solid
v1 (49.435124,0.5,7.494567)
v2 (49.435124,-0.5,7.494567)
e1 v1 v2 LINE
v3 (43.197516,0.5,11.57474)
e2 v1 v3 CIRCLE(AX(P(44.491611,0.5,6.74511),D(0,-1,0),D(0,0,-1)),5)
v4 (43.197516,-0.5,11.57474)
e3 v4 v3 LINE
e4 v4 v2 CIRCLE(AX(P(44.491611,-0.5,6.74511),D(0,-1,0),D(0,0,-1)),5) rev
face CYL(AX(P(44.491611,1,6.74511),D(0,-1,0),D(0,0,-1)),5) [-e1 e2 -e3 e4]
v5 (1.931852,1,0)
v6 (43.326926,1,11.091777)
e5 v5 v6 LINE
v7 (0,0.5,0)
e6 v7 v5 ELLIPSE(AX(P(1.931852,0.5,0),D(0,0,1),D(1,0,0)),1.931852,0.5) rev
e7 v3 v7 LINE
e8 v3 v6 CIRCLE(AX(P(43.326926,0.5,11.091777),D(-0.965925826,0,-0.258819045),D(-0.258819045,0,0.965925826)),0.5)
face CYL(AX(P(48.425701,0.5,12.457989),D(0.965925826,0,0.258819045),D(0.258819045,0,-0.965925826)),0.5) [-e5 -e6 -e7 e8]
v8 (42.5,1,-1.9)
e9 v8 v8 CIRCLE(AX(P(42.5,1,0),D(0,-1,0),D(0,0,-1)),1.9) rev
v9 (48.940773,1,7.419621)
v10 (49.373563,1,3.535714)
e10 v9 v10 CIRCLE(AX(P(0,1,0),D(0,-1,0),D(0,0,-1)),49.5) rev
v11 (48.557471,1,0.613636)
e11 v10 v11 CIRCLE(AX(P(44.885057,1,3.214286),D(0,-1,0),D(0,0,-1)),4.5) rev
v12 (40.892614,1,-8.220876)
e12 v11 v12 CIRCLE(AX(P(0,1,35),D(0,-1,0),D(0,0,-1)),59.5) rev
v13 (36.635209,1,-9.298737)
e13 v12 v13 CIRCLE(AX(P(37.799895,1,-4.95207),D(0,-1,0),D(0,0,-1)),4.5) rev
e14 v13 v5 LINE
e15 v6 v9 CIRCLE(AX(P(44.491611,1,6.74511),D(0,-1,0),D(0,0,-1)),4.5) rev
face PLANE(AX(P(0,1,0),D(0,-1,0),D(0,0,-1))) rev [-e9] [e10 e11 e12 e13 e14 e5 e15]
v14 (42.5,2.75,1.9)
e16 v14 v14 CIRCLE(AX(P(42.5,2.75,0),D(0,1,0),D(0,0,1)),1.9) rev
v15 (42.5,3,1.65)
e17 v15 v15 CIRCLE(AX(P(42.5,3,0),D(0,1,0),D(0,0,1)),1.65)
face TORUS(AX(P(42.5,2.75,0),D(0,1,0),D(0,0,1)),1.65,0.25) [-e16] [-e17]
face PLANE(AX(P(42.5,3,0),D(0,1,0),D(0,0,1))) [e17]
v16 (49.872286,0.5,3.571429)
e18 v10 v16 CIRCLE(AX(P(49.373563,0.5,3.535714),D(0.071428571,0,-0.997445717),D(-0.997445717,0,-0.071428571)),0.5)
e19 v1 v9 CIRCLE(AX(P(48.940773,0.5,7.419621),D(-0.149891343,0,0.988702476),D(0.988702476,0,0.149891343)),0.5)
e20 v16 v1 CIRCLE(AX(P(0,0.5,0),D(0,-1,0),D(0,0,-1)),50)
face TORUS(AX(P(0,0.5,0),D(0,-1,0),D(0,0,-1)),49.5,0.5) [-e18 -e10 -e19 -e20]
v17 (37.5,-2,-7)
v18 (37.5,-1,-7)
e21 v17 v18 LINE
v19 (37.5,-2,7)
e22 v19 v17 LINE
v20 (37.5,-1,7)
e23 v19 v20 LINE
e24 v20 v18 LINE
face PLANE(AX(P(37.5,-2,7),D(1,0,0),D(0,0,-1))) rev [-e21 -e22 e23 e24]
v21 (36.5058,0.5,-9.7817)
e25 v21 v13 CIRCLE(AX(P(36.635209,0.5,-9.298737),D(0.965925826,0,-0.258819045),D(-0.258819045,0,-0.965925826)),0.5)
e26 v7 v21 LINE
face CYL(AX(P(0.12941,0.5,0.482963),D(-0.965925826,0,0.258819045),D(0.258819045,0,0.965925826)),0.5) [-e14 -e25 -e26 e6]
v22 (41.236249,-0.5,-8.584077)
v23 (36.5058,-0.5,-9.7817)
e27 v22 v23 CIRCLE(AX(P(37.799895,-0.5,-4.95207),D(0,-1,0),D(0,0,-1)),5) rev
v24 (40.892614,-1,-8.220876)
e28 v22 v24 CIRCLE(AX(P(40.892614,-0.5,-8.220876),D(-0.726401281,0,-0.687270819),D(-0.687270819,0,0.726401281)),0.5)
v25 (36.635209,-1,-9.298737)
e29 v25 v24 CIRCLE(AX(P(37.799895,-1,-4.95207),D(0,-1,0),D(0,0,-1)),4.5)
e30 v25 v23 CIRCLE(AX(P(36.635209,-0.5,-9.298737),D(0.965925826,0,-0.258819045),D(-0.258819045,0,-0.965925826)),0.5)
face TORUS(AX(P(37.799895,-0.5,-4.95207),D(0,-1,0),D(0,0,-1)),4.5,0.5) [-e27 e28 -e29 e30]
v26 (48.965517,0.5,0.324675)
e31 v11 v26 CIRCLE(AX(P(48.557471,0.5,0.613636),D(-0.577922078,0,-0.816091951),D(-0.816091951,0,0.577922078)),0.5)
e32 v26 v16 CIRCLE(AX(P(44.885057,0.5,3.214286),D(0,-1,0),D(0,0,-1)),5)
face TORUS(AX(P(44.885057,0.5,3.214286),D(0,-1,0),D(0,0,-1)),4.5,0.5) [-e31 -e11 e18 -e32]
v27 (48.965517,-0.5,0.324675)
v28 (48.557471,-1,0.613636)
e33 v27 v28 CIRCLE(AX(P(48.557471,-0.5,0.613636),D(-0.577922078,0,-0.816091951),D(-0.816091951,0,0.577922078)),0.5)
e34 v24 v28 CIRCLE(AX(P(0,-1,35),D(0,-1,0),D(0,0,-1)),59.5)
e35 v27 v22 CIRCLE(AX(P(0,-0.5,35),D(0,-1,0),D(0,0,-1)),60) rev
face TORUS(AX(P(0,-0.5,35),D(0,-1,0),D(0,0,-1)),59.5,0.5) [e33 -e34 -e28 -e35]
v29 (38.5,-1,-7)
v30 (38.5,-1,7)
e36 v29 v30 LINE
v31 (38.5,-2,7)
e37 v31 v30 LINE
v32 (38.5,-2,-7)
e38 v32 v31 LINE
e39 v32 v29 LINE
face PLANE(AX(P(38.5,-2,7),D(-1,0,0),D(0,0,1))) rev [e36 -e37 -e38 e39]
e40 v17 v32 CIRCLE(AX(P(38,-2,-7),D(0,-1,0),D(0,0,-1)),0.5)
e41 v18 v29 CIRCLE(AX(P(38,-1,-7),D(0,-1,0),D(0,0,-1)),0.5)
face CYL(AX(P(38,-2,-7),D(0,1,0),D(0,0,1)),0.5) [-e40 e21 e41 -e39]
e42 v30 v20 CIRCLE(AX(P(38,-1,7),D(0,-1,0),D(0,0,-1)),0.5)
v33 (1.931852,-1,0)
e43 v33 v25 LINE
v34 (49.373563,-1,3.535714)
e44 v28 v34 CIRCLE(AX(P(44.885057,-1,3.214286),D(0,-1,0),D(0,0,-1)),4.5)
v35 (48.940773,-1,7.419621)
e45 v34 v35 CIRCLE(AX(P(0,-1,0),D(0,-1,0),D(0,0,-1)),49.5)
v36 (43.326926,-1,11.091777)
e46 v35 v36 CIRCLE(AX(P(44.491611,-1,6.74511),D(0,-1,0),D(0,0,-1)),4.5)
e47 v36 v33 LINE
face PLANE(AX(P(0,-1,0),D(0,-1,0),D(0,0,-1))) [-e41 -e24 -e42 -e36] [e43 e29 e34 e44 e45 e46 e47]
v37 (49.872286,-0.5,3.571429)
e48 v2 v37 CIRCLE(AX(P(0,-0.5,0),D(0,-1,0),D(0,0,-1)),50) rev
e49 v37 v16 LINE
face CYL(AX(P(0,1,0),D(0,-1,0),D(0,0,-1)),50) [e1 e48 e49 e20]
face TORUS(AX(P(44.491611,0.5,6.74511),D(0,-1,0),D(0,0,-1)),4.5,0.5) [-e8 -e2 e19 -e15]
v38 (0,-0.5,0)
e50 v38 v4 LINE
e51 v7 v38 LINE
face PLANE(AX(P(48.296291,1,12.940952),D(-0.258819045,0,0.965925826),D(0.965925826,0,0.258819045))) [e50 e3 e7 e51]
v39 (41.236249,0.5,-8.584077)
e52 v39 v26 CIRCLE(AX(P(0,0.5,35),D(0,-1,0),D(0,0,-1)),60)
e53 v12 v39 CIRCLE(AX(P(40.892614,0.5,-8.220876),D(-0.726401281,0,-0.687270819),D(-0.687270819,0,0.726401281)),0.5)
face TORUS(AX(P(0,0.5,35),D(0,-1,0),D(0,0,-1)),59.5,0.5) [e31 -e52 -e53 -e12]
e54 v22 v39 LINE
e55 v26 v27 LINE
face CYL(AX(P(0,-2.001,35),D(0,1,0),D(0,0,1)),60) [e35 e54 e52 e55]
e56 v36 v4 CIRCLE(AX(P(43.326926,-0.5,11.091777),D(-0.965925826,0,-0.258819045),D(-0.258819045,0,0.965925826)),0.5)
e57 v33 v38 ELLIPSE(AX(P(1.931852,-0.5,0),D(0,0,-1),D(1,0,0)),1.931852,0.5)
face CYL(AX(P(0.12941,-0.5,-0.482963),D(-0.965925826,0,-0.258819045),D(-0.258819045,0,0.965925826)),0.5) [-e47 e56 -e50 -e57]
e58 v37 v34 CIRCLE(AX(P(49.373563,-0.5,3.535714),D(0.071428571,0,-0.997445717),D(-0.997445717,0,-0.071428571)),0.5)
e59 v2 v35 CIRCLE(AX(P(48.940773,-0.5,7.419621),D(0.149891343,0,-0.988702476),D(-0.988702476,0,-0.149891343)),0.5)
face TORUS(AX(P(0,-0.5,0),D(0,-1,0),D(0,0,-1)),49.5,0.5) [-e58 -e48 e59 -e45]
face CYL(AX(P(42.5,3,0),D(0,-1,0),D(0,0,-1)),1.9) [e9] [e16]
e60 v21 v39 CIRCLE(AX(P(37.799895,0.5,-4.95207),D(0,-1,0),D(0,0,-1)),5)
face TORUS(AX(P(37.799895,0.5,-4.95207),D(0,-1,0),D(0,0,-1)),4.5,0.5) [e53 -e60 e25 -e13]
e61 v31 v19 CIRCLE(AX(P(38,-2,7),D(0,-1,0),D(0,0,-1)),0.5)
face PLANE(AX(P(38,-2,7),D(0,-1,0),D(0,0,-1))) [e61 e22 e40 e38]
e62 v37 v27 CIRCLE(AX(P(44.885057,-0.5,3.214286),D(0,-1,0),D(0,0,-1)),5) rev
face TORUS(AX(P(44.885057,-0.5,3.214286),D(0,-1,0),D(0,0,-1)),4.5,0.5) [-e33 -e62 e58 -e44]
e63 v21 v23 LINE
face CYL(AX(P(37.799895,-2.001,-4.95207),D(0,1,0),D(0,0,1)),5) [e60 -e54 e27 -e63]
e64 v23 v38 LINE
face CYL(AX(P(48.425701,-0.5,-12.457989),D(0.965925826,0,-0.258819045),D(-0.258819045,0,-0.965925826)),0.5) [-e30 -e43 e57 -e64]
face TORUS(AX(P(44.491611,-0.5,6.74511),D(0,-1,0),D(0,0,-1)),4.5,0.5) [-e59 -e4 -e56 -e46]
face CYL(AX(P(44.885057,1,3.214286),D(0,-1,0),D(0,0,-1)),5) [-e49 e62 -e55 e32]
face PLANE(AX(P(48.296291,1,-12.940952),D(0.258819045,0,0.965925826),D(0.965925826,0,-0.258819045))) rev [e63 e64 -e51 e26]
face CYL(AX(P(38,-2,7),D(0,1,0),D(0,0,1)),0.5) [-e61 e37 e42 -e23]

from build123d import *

# Parameters (mm, degrees)
BOSS_EXTRUDE2_DEPTH = 1
BOSS_EXTRUDE3_DEPTH = 1
CUT_EXTRUDE3_START  = -2
CUT_EXTRUDE3_DEPTH  = 2
FILLET1_R           = 5
FILLET2_R           = 0.5
SKETCH2_R           = 1.9
BOSS_EXTRUDE4_DEPTH = 2
FILLET3_R           = 0.25


# Read off the part's stored shape, not the designer's step: Cut-Extrude3
with BuildPart() as part:
    # Sketch1 → Boss-Extrude2 (new, symmetric)
    with BuildSketch(Plane(origin=(0, 0, 0), x_dir=(1, 0, 0), z_dir=(0, 1, 0))):
        with BuildLine():
            Line((48.296291314, -12.940952255), (0, 0))
            Line((0, 0), (48.296291314, 12.940952255))
            ThreePointArc((48.296291314, 12.940952255), (50, 0), (48.296291314, -12.940952255))
        make_face()
    extrude(amount=BOSS_EXTRUDE2_DEPTH, both=True)

    # Sketch3 → Boss-Extrude3 (add)
    with BuildSketch(Plane(origin=(0, -1, 0), x_dir=(-1, 0, 0), z_dir=(0, -1, 0))):
        with BuildLine():
            Line((-38.5, -7), (-38.5, 7))
            ThreePointArc((-38.5, 7), (-38, 7.5), (-37.5, 7))
            Line((-37.5, 7), (-37.5, -7))
            ThreePointArc((-37.5, -7), (-38, -7.5), (-38.5, -7))
        make_face()
    extrude(amount=BOSS_EXTRUDE3_DEPTH)

    # Cut-Extrude3 outline → Cut-Extrude3 (cut)
    with BuildSketch(Plane(origin=(0, 1, 0), x_dir=(1, 0, 0), z_dir=(0, 1, 0)).offset(CUT_EXTRUDE3_START)):
        with BuildLine():
            ThreePointArc((39.129720832, 10.484777097), (44.969397941, 4.720942194), (49.96810207, -1.785714286))
            ThreePointArc((49.96810207, -1.785714286), (49.680896013, 5.639908806), (48.296291314, 12.940952255))
            Line((48.296291314, 12.940952255), (39.129720832, 10.484777097))
        make_face()
    extrude(amount=CUT_EXTRUDE3_DEPTH, mode=Mode.SUBTRACT)

    # Fillet1
    fillet1_edges = [part.edges().sort_by_distance(p)[0] for p in [
        (39.129720832, 0, -10.484777097),
        (49.96810207, 0, 1.785714286),
        (48.296291314, 0, 12.940952255),
    ]]
    fillet(fillet1_edges, radius=FILLET1_R)

    # Fillet2
    fillet2_edges = [part.edges().sort_by_distance(p)[0] for p in [
        (18.252899917, -1, -4.890849792),
        (18.252899917, 1, -4.890849792),
        (45.320316883, -1, -4.32008237),
        (49.692435611, -1, 5.537313704),
        (21.598758088, -1, 5.787369787),
        (47.228674266, -1, 10.929424828),
        (49.700770587, -1, 1.869330184),
        (39.027043508, -1, -9.799142423),
        (45.320316883, 1, -4.32008237),
        (21.598758088, 1, 5.787369787),
        (49.692435611, 1, 5.537313704),
        (47.228674266, 1, 10.929424828),
        (49.700770587, 1, 1.869330184),
        (39.027043508, 1, -9.799142423),
    ]]
    fillet(fillet2_edges, radius=FILLET2_R)

    # Sketch2 → Boss-Extrude4 (add)
    with BuildSketch(Plane(origin=(0, 1, 0), x_dir=(1, 0, 0), z_dir=(0, 1, 0))):
        with Locations(Location((42.5, 0, 0), (0, 0, 90))):
            Circle(SKETCH2_R)
    extrude(amount=BOSS_EXTRUDE4_DEPTH)

    # Fillet3
    fillet3_edges = [part.edges().sort_by_distance(p)[0] for p in [
        (42.5, 3, 1.9),
    ]]
    fillet(fillet3_edges, radius=FILLET3_R)


solid = part.part
